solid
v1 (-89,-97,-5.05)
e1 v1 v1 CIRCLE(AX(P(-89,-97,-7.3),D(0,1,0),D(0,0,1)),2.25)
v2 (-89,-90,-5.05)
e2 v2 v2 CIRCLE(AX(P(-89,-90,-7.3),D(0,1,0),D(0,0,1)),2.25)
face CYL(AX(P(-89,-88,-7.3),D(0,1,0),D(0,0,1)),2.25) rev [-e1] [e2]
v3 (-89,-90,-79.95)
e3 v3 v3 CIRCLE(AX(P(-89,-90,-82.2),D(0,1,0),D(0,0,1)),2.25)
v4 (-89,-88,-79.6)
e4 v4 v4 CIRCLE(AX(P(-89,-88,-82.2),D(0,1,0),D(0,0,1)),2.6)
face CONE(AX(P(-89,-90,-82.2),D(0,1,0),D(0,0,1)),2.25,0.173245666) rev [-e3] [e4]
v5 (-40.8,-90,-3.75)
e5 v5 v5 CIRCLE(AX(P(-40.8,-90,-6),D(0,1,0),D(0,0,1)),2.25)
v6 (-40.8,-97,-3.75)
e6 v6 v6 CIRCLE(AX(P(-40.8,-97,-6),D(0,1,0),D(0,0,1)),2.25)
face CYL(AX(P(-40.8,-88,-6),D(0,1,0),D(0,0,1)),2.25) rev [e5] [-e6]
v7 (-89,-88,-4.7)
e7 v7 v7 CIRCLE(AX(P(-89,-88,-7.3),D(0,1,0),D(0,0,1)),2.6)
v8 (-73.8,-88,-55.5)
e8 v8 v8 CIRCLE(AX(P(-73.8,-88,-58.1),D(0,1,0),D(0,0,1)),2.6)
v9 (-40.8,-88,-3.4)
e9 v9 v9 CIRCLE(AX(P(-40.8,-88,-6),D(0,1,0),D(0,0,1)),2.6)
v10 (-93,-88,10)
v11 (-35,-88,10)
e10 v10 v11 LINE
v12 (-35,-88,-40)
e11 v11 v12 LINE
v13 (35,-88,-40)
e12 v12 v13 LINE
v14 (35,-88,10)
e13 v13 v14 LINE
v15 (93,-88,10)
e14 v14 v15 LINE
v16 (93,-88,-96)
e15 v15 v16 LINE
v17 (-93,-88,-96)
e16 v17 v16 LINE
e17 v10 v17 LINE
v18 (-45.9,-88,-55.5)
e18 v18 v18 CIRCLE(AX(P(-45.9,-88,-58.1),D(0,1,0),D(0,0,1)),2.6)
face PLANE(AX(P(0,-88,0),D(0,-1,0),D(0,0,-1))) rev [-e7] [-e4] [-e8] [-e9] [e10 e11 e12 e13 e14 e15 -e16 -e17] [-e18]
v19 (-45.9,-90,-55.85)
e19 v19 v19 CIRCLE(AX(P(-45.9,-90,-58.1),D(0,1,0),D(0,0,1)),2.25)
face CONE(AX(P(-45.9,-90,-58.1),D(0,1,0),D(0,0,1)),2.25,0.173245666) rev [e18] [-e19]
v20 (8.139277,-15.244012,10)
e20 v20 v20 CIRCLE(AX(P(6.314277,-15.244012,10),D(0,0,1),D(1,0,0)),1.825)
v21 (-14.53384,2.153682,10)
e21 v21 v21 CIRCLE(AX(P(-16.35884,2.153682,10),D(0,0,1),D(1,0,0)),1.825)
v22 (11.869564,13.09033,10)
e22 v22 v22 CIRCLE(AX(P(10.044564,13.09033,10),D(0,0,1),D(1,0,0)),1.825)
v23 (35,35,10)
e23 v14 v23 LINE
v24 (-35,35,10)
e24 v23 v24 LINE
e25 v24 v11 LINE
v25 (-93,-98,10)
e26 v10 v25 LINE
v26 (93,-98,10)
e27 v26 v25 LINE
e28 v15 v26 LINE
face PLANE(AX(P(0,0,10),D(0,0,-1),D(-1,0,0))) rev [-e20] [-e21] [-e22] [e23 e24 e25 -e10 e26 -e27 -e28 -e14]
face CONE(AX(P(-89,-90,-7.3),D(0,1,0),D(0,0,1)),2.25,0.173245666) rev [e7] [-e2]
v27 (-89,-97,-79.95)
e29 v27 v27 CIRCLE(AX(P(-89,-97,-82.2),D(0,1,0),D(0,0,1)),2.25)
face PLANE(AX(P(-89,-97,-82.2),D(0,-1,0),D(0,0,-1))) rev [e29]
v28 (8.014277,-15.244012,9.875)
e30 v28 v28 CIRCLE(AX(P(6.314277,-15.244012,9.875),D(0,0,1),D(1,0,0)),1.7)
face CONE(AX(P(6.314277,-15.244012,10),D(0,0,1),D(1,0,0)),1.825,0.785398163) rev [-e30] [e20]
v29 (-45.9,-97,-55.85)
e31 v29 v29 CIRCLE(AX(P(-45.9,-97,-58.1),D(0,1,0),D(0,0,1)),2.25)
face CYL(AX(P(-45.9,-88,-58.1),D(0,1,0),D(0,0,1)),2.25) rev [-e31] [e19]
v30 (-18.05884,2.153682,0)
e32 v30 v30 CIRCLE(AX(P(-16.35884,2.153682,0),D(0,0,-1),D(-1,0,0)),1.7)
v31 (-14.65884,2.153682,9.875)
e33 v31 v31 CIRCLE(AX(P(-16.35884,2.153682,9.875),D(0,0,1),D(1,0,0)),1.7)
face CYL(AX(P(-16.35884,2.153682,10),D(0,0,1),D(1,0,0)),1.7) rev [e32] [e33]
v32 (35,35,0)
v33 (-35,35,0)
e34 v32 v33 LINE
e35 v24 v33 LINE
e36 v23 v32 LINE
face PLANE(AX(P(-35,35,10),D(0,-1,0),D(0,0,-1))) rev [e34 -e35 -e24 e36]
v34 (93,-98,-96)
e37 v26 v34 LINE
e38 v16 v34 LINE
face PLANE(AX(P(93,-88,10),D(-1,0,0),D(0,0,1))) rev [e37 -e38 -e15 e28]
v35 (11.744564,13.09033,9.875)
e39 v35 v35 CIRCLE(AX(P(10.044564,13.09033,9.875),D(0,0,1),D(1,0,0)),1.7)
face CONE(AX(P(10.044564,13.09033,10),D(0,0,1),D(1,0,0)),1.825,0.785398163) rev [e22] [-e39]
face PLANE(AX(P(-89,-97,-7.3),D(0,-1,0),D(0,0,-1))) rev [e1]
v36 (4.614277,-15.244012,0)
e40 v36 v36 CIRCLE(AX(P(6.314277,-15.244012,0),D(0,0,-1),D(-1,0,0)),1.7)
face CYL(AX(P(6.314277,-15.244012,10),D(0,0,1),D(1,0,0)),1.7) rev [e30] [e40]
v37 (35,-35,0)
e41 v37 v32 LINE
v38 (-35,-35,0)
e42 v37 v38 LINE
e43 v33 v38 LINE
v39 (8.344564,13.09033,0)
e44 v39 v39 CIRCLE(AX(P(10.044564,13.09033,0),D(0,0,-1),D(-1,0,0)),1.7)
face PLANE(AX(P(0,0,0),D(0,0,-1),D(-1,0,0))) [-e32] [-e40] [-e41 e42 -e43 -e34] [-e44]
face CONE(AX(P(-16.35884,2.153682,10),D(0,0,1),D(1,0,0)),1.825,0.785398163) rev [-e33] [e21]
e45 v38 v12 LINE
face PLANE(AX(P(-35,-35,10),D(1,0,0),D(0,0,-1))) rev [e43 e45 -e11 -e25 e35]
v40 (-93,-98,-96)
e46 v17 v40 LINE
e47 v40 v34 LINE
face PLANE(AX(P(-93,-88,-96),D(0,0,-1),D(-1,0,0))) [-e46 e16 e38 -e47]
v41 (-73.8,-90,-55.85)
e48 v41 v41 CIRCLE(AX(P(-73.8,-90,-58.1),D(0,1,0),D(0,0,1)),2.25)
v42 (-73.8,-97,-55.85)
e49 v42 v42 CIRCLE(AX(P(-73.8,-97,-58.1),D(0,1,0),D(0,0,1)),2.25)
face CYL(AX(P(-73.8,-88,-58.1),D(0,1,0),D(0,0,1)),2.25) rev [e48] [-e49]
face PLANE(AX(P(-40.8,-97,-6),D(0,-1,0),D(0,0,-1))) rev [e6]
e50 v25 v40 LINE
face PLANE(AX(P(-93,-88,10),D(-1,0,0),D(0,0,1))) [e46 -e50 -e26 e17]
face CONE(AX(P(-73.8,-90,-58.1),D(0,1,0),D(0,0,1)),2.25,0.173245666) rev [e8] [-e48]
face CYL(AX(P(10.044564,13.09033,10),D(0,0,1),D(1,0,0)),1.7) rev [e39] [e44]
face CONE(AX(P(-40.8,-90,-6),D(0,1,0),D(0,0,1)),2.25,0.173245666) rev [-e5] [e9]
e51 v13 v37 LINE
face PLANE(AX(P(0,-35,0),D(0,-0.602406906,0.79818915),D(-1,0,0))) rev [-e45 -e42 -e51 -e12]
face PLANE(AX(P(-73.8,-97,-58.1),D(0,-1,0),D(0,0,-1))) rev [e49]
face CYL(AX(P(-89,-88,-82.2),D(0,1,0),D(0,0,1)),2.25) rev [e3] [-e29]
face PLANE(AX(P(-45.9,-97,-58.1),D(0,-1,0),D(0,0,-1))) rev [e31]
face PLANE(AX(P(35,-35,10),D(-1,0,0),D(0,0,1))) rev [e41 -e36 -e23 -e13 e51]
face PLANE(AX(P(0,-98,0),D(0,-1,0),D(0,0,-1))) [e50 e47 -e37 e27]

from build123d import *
from OCP.BRepFilletAPI import BRepFilletAPI_MakeChamfer

# Parameters (mm, degrees)
SKETCH1_W                      = 70
SKETCH1_H                      = 70
BOSS_EXTRUDE1_DEPTH            = 10
M3_CLEARANCE_HOLE1_D           = 3.4
M3_CLEARANCE_HOLE1_CSINK_D     = 3.65
M3_CLEARANCE_HOLE1_CSINK_ANGLE = 90
SKETCH14_W                     = 70
SKETCH14_H                     = 10
BOSS_EXTRUDE2_DEPTH            = 63
SKETCH13_W                     = 186
SKETCH13_H                     = 106
BOSS_EXTRUDE3_DEPTH            = 10
CHAMFER1_SIZE                  = 40
CHAMFER1_SIZE2                 = 53
HOLE1_D                        = 4.5
HOLE1_DEPTH                    = 9
HOLE1_CBORE_D                  = 5.2
HOLE1_CBORE_DEPTH              = 2
CHAMFER2_SIZE                  = 2
CHAMFER2_SIZE_2                = 0.35


with BuildPart() as part:
    # Sketch1 → Boss-Extrude1 (new body)
    with BuildSketch(Plane.XY):
        Rectangle(SKETCH1_W, SKETCH1_H)
    extrude(amount=BOSS_EXTRUDE1_DEPTH)

    # M3 Clearance Hole1 (through all)
    with Locations(Plane.XY.offset(10)):
        with Locations((6.314276634, -15.244012286), (10.044563579, 13.090330115), (-16.358840213, 2.153682172)):
            CounterSinkHole(M3_CLEARANCE_HOLE1_D / 2, M3_CLEARANCE_HOLE1_CSINK_D / 2, counter_sink_angle=M3_CLEARANCE_HOLE1_CSINK_ANGLE)

    # Sketch14 → Boss-Extrude2 (add)
    with BuildSketch(Plane.XZ.offset(35)):
        with Locations((0, 5)):
            Rectangle(SKETCH14_W, SKETCH14_H)
    extrude(amount=BOSS_EXTRUDE2_DEPTH)

    # Sketch13 → Boss-Extrude3 (add)
    with BuildSketch(Plane.XZ.offset(98)):
        with Locations((0, -43)):
            Rectangle(SKETCH13_W, SKETCH13_H)
    extrude(amount=-BOSS_EXTRUDE3_DEPTH)

    # Chamfer1
    chamfer1_edges = [part.edges().sort_by_distance(p)[0] for p in [
        (0, -88, 0),
    ]]
    chamfer1_side = [part.faces().sort_by_distance(p)[0] for p in [
        (0, -88, -44.766933109),
    ]]
    chamfer(chamfer1_edges, length=CHAMFER1_SIZE, length2=CHAMFER1_SIZE2, reference=chamfer1_side[0])

    # Hole1
    with Locations(Plane(origin=(0, -88, 0), x_dir=(1, 0, 0), z_dir=(0, 1, 0))):
        with Locations((-89, 7.3), (-89, 82.2), (-40.8, 6), (-73.8, 58.1), (-45.9, 58.1)):
            CounterBoreHole(HOLE1_D / 2, HOLE1_CBORE_D / 2, HOLE1_CBORE_DEPTH, depth=HOLE1_DEPTH)

    # Chamfer2
    chamfer2_edges_1 = [part.edges().sort_by_distance(p)[0] for p in [
        (-43.4, -90, -6),
    ]]
    chamfer2_side_1 = [part.faces().sort_by_distance(p)[0] for p in [
        (-43.4, -89.993, -6),
    ]]
    chamfer2_edges_2 = [part.edges().sort_by_distance(p)[0] for p in [
        (-91.6, -90, -82.2),
    ]]
    chamfer2_side_2 = [part.faces().sort_by_distance(p)[0] for p in [
        (-91.6, -89.993, -82.2),
    ]]
    chamfer2_edges_3 = [part.edges().sort_by_distance(p)[0] for p in [
        (-91.6, -90, -7.3),
    ]]
    chamfer2_side_3 = [part.faces().sort_by_distance(p)[0] for p in [
        (-91.6, -89.993, -7.3),
    ]]
    chamfer2_edges_4 = [part.edges().sort_by_distance(p)[0] for p in [
        (-48.5, -90, -58.1),
    ]]
    chamfer2_side_4 = [part.faces().sort_by_distance(p)[0] for p in [
        (-48.5, -89.993, -58.1),
    ]]
    chamfer2_edges_5 = [part.edges().sort_by_distance(p)[0] for p in [
        (-76.4, -90, -58.1),
    ]]
    chamfer2_side_5 = [part.faces().sort_by_distance(p)[0] for p in [
        (-76.4, -89.993, -58.1),
    ]]
    chamfer2 = BRepFilletAPI_MakeChamfer(part.part.solid().wrapped)
    for e in chamfer2_edges_1:
        chamfer2.Add(CHAMFER2_SIZE - 0.0001, CHAMFER2_SIZE_2 - 0.0001, e.wrapped, chamfer2_side_1[0].wrapped)
    for e in chamfer2_edges_2:
        chamfer2.Add(CHAMFER2_SIZE - 0.0001, CHAMFER2_SIZE_2 - 0.0001, e.wrapped, chamfer2_side_2[0].wrapped)
    for e in chamfer2_edges_3:
        chamfer2.Add(CHAMFER2_SIZE - 0.0001, CHAMFER2_SIZE_2 - 0.0001, e.wrapped, chamfer2_side_3[0].wrapped)
    for e in chamfer2_edges_4:
        chamfer2.Add(CHAMFER2_SIZE - 0.0001, CHAMFER2_SIZE_2 - 0.0001, e.wrapped, chamfer2_side_4[0].wrapped)
    for e in chamfer2_edges_5:
        chamfer2.Add(CHAMFER2_SIZE - 0.0001, CHAMFER2_SIZE_2 - 0.0001, e.wrapped, chamfer2_side_5[0].wrapped)
    add(Compound.cast(chamfer2.Shape()), mode=Mode.REPLACE)  # a hair under: the kernel refuses the full size


solid = part.part
